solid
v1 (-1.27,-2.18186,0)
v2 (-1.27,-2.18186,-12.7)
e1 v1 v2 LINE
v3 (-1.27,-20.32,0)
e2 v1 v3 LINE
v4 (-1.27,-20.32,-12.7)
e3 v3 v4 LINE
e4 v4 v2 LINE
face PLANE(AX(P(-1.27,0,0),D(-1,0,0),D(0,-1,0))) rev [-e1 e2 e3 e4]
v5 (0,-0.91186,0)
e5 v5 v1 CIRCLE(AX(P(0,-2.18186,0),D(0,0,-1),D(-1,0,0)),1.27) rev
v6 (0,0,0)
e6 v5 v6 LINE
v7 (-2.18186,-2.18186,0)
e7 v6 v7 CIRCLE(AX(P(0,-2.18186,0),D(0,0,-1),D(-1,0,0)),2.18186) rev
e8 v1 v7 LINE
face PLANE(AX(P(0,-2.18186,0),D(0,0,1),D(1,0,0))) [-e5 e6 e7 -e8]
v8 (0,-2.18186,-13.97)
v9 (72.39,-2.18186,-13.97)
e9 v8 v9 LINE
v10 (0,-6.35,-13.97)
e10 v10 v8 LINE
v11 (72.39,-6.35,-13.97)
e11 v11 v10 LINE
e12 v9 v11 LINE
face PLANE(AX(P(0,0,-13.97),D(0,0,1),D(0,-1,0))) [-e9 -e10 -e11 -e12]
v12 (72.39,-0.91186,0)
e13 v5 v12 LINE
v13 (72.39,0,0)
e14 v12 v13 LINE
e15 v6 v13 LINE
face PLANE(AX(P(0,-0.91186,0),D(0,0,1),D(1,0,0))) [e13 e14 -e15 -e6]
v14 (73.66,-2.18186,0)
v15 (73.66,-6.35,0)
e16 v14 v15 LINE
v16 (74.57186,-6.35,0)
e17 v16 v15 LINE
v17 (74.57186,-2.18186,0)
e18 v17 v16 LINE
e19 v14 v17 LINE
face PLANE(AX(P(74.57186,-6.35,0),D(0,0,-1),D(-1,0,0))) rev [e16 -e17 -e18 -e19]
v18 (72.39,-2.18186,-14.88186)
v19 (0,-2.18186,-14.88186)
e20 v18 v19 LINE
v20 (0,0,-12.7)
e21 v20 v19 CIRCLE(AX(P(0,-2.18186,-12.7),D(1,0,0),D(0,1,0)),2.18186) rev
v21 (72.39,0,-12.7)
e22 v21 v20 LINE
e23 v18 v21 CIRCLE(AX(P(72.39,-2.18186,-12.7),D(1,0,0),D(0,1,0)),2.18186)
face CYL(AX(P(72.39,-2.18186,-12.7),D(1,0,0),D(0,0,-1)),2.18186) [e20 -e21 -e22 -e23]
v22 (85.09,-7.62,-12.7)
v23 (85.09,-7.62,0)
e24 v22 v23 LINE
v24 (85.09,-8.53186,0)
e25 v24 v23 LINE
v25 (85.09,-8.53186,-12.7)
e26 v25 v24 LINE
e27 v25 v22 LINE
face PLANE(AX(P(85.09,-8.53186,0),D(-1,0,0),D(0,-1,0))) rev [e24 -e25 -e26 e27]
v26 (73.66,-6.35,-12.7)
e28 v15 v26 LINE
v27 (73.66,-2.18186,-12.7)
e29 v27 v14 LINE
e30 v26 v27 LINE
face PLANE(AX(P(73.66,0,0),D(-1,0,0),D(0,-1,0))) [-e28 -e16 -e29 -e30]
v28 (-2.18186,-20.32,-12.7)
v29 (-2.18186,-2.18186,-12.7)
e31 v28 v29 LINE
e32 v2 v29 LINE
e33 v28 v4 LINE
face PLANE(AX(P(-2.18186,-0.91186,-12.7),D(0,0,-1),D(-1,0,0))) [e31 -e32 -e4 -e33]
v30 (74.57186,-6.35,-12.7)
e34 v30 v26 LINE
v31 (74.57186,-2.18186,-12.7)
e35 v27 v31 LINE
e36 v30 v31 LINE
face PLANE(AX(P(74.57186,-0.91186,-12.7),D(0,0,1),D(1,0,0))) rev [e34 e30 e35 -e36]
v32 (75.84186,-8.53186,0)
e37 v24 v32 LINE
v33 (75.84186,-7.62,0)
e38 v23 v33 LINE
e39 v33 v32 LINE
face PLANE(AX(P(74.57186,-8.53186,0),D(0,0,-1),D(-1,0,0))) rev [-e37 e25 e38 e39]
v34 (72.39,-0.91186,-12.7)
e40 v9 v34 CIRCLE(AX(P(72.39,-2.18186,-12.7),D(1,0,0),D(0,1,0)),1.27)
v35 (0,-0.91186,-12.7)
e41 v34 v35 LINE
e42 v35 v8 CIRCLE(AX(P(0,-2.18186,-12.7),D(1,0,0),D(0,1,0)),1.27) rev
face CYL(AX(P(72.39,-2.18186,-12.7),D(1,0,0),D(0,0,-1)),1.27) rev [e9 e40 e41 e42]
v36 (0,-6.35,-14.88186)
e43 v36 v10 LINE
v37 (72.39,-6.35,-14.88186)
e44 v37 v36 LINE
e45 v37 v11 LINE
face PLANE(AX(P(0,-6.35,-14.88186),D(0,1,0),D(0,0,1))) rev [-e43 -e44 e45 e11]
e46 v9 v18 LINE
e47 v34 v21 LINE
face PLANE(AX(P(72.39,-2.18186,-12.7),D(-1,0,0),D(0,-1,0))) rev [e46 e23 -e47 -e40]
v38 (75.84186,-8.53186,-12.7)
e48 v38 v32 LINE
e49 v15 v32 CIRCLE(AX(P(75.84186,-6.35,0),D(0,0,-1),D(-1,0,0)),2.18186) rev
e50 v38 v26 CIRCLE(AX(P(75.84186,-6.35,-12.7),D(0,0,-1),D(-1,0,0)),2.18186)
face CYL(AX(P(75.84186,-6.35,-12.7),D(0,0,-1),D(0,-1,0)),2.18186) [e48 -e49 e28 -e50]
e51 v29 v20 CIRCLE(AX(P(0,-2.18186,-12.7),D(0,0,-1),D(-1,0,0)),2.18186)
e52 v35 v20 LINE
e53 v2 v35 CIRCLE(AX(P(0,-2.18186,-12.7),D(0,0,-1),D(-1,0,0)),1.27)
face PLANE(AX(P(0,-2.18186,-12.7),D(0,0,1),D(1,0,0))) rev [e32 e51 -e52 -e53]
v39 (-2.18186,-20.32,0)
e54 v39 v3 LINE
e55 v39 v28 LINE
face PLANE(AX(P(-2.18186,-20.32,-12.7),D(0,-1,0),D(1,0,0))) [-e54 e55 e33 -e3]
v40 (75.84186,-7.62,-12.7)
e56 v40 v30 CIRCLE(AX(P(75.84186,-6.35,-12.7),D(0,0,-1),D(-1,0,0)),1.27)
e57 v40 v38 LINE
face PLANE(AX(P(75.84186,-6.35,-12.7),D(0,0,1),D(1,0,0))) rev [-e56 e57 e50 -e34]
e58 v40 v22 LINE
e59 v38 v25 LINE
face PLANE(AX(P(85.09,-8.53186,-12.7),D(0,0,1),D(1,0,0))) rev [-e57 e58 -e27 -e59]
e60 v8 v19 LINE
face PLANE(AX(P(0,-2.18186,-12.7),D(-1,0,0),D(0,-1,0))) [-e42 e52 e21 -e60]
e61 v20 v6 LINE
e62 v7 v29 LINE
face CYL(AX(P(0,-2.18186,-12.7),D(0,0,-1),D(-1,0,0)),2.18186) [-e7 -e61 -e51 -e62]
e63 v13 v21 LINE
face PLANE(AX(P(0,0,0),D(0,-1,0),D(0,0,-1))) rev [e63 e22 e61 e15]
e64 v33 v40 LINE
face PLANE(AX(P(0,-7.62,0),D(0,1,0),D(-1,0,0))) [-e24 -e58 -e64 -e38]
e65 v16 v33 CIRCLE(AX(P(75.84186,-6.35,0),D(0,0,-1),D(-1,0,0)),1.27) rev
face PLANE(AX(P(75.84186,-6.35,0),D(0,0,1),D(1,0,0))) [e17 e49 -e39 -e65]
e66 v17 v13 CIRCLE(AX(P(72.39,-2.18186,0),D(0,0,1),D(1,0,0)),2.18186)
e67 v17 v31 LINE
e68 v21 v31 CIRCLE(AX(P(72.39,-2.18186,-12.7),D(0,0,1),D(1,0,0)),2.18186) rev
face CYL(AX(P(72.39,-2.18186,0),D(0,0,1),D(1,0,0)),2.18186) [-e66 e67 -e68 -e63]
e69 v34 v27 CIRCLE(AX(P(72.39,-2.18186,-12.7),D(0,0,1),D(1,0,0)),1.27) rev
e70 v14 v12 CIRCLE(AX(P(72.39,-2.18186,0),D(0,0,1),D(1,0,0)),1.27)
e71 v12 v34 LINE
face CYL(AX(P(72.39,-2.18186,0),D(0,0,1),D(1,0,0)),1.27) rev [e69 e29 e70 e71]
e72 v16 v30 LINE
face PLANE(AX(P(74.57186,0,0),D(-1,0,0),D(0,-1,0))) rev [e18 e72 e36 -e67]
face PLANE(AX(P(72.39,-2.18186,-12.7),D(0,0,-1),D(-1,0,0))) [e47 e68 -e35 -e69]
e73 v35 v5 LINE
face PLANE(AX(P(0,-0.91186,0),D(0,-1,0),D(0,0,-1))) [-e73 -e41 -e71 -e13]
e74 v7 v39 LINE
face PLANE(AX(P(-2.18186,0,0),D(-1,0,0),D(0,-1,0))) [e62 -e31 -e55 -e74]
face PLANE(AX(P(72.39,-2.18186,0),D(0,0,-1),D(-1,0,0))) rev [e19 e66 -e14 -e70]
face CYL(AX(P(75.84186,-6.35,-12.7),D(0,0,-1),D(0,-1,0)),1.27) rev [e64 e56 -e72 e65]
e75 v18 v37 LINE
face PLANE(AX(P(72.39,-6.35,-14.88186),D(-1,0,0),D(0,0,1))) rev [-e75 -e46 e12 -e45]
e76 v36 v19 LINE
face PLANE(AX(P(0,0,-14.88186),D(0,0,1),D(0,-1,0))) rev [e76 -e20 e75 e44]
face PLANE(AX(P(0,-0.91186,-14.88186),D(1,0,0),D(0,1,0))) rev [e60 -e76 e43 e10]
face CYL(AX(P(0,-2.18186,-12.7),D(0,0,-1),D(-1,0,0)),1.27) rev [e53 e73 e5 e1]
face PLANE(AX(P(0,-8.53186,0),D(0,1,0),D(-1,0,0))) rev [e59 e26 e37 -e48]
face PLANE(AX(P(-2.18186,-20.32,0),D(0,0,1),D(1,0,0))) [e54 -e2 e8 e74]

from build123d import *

# Parameters (mm, degrees)
SKETCH1_W          = 72.39
SKETCH1_H          = 12.7
BASE_FLANGE1_DEPTH = 0.91186
EDGE_FLANGE1_DEPTH = 12.7
EDGE_FLANGE2_DEPTH = 12.7
EDGE_FLANGE3_DEPTH = 12.7
EDGE_FLANGE4_DEPTH = 72.39


# Sheet-metal steps are written as plain solids
with BuildPart() as part:
    # Sketch1 → Base-Flange1 (new body)
    with BuildSketch(Plane(origin=(0, 0, 0), x_dir=(1, 0, 0), z_dir=(0, 1, 0))):
        with Locations((36.195, 6.35)):
            Rectangle(SKETCH1_W, SKETCH1_H)
    extrude(amount=-BASE_FLANGE1_DEPTH)

    # Edge-Flange1 section (across the edge) → Edge-Flange1 (add)
    with BuildSketch(Plane(origin=(-1.27, -0.91186, 0), x_dir=(1, 0, 0), z_dir=(0, 0, -1))):
        with BuildLine():
            Line((-0.91186, 1.27), (-0.91186, 19.40814))
            Line((-0.91186, 19.40814), (0, 19.40814))
            Line((0, 19.40814), (0, 1.27))
            ThreePointArc((0, 1.27), (0.371974388, 0.371974388), (1.27, 0))
            Line((1.27, 0), (1.27, -0.91186))
            ThreePointArc((1.27, -0.91186), (-0.272808002, -0.272808002), (-0.91186, 1.27))
        make_face()
    extrude(amount=EDGE_FLANGE1_DEPTH)

    # Edge-Flange2 section (across the edge) → Edge-Flange2 (add)
    with BuildSketch(Plane(origin=(73.66, -0.91186, -12.7), x_dir=(-1, 0, 0), z_dir=(0, 0, 1))):
        with BuildLine():
            Line((-0.91186, 1.27), (-0.91186, 5.43814))
            Line((-0.91186, 5.43814), (0, 5.43814))
            Line((0, 5.43814), (0, 1.27))
            ThreePointArc((0, 1.27), (0.371974388, 0.371974388), (1.27, 0))
            Line((1.27, 0), (1.27, -0.91186))
            ThreePointArc((1.27, -0.91186), (-0.272808002, -0.272808002), (-0.91186, 1.27))
        make_face()
    extrude(amount=EDGE_FLANGE2_DEPTH)

    # Edge-Flange3 section (across the edge) → Edge-Flange3 (add)
    with BuildSketch(Plane(origin=(74.57186, -7.62, 0), x_dir=(0, 1, 0), z_dir=(0, 0, -1))):
        with BuildLine():
            Line((-0.91186, 1.27), (-0.91186, 10.51814))
            Line((-0.91186, 10.51814), (0, 10.51814))
            Line((0, 10.51814), (0, 1.27))
            ThreePointArc((0, 1.27), (0.371974388, 0.371974388), (1.27, 0))
            Line((1.27, 0), (1.27, -0.91186))
            ThreePointArc((1.27, -0.91186), (-0.272808002, -0.272808002), (-0.91186, 1.27))
        make_face()
    extrude(amount=EDGE_FLANGE3_DEPTH)

    # Edge-Flange4 section (across the edge) → Edge-Flange4 (add)
    with BuildSketch(Plane(origin=(0, -0.91186, -13.97), x_dir=(0, 0, 1), z_dir=(1, 0, 0))):
        with BuildLine():
            Line((-0.91186, 1.27), (-0.91186, 5.43814))
            Line((-0.91186, 5.43814), (0, 5.43814))
            Line((0, 5.43814), (0, 1.27))
            ThreePointArc((0, 1.27), (0.371974388, 0.371974388), (1.27, 0))
            Line((1.27, 0), (1.27, -0.91186))
            ThreePointArc((1.27, -0.91186), (-0.272808002, -0.272808002), (-0.91186, 1.27))
        make_face()
    extrude(amount=EDGE_FLANGE4_DEPTH)


solid = part.part
